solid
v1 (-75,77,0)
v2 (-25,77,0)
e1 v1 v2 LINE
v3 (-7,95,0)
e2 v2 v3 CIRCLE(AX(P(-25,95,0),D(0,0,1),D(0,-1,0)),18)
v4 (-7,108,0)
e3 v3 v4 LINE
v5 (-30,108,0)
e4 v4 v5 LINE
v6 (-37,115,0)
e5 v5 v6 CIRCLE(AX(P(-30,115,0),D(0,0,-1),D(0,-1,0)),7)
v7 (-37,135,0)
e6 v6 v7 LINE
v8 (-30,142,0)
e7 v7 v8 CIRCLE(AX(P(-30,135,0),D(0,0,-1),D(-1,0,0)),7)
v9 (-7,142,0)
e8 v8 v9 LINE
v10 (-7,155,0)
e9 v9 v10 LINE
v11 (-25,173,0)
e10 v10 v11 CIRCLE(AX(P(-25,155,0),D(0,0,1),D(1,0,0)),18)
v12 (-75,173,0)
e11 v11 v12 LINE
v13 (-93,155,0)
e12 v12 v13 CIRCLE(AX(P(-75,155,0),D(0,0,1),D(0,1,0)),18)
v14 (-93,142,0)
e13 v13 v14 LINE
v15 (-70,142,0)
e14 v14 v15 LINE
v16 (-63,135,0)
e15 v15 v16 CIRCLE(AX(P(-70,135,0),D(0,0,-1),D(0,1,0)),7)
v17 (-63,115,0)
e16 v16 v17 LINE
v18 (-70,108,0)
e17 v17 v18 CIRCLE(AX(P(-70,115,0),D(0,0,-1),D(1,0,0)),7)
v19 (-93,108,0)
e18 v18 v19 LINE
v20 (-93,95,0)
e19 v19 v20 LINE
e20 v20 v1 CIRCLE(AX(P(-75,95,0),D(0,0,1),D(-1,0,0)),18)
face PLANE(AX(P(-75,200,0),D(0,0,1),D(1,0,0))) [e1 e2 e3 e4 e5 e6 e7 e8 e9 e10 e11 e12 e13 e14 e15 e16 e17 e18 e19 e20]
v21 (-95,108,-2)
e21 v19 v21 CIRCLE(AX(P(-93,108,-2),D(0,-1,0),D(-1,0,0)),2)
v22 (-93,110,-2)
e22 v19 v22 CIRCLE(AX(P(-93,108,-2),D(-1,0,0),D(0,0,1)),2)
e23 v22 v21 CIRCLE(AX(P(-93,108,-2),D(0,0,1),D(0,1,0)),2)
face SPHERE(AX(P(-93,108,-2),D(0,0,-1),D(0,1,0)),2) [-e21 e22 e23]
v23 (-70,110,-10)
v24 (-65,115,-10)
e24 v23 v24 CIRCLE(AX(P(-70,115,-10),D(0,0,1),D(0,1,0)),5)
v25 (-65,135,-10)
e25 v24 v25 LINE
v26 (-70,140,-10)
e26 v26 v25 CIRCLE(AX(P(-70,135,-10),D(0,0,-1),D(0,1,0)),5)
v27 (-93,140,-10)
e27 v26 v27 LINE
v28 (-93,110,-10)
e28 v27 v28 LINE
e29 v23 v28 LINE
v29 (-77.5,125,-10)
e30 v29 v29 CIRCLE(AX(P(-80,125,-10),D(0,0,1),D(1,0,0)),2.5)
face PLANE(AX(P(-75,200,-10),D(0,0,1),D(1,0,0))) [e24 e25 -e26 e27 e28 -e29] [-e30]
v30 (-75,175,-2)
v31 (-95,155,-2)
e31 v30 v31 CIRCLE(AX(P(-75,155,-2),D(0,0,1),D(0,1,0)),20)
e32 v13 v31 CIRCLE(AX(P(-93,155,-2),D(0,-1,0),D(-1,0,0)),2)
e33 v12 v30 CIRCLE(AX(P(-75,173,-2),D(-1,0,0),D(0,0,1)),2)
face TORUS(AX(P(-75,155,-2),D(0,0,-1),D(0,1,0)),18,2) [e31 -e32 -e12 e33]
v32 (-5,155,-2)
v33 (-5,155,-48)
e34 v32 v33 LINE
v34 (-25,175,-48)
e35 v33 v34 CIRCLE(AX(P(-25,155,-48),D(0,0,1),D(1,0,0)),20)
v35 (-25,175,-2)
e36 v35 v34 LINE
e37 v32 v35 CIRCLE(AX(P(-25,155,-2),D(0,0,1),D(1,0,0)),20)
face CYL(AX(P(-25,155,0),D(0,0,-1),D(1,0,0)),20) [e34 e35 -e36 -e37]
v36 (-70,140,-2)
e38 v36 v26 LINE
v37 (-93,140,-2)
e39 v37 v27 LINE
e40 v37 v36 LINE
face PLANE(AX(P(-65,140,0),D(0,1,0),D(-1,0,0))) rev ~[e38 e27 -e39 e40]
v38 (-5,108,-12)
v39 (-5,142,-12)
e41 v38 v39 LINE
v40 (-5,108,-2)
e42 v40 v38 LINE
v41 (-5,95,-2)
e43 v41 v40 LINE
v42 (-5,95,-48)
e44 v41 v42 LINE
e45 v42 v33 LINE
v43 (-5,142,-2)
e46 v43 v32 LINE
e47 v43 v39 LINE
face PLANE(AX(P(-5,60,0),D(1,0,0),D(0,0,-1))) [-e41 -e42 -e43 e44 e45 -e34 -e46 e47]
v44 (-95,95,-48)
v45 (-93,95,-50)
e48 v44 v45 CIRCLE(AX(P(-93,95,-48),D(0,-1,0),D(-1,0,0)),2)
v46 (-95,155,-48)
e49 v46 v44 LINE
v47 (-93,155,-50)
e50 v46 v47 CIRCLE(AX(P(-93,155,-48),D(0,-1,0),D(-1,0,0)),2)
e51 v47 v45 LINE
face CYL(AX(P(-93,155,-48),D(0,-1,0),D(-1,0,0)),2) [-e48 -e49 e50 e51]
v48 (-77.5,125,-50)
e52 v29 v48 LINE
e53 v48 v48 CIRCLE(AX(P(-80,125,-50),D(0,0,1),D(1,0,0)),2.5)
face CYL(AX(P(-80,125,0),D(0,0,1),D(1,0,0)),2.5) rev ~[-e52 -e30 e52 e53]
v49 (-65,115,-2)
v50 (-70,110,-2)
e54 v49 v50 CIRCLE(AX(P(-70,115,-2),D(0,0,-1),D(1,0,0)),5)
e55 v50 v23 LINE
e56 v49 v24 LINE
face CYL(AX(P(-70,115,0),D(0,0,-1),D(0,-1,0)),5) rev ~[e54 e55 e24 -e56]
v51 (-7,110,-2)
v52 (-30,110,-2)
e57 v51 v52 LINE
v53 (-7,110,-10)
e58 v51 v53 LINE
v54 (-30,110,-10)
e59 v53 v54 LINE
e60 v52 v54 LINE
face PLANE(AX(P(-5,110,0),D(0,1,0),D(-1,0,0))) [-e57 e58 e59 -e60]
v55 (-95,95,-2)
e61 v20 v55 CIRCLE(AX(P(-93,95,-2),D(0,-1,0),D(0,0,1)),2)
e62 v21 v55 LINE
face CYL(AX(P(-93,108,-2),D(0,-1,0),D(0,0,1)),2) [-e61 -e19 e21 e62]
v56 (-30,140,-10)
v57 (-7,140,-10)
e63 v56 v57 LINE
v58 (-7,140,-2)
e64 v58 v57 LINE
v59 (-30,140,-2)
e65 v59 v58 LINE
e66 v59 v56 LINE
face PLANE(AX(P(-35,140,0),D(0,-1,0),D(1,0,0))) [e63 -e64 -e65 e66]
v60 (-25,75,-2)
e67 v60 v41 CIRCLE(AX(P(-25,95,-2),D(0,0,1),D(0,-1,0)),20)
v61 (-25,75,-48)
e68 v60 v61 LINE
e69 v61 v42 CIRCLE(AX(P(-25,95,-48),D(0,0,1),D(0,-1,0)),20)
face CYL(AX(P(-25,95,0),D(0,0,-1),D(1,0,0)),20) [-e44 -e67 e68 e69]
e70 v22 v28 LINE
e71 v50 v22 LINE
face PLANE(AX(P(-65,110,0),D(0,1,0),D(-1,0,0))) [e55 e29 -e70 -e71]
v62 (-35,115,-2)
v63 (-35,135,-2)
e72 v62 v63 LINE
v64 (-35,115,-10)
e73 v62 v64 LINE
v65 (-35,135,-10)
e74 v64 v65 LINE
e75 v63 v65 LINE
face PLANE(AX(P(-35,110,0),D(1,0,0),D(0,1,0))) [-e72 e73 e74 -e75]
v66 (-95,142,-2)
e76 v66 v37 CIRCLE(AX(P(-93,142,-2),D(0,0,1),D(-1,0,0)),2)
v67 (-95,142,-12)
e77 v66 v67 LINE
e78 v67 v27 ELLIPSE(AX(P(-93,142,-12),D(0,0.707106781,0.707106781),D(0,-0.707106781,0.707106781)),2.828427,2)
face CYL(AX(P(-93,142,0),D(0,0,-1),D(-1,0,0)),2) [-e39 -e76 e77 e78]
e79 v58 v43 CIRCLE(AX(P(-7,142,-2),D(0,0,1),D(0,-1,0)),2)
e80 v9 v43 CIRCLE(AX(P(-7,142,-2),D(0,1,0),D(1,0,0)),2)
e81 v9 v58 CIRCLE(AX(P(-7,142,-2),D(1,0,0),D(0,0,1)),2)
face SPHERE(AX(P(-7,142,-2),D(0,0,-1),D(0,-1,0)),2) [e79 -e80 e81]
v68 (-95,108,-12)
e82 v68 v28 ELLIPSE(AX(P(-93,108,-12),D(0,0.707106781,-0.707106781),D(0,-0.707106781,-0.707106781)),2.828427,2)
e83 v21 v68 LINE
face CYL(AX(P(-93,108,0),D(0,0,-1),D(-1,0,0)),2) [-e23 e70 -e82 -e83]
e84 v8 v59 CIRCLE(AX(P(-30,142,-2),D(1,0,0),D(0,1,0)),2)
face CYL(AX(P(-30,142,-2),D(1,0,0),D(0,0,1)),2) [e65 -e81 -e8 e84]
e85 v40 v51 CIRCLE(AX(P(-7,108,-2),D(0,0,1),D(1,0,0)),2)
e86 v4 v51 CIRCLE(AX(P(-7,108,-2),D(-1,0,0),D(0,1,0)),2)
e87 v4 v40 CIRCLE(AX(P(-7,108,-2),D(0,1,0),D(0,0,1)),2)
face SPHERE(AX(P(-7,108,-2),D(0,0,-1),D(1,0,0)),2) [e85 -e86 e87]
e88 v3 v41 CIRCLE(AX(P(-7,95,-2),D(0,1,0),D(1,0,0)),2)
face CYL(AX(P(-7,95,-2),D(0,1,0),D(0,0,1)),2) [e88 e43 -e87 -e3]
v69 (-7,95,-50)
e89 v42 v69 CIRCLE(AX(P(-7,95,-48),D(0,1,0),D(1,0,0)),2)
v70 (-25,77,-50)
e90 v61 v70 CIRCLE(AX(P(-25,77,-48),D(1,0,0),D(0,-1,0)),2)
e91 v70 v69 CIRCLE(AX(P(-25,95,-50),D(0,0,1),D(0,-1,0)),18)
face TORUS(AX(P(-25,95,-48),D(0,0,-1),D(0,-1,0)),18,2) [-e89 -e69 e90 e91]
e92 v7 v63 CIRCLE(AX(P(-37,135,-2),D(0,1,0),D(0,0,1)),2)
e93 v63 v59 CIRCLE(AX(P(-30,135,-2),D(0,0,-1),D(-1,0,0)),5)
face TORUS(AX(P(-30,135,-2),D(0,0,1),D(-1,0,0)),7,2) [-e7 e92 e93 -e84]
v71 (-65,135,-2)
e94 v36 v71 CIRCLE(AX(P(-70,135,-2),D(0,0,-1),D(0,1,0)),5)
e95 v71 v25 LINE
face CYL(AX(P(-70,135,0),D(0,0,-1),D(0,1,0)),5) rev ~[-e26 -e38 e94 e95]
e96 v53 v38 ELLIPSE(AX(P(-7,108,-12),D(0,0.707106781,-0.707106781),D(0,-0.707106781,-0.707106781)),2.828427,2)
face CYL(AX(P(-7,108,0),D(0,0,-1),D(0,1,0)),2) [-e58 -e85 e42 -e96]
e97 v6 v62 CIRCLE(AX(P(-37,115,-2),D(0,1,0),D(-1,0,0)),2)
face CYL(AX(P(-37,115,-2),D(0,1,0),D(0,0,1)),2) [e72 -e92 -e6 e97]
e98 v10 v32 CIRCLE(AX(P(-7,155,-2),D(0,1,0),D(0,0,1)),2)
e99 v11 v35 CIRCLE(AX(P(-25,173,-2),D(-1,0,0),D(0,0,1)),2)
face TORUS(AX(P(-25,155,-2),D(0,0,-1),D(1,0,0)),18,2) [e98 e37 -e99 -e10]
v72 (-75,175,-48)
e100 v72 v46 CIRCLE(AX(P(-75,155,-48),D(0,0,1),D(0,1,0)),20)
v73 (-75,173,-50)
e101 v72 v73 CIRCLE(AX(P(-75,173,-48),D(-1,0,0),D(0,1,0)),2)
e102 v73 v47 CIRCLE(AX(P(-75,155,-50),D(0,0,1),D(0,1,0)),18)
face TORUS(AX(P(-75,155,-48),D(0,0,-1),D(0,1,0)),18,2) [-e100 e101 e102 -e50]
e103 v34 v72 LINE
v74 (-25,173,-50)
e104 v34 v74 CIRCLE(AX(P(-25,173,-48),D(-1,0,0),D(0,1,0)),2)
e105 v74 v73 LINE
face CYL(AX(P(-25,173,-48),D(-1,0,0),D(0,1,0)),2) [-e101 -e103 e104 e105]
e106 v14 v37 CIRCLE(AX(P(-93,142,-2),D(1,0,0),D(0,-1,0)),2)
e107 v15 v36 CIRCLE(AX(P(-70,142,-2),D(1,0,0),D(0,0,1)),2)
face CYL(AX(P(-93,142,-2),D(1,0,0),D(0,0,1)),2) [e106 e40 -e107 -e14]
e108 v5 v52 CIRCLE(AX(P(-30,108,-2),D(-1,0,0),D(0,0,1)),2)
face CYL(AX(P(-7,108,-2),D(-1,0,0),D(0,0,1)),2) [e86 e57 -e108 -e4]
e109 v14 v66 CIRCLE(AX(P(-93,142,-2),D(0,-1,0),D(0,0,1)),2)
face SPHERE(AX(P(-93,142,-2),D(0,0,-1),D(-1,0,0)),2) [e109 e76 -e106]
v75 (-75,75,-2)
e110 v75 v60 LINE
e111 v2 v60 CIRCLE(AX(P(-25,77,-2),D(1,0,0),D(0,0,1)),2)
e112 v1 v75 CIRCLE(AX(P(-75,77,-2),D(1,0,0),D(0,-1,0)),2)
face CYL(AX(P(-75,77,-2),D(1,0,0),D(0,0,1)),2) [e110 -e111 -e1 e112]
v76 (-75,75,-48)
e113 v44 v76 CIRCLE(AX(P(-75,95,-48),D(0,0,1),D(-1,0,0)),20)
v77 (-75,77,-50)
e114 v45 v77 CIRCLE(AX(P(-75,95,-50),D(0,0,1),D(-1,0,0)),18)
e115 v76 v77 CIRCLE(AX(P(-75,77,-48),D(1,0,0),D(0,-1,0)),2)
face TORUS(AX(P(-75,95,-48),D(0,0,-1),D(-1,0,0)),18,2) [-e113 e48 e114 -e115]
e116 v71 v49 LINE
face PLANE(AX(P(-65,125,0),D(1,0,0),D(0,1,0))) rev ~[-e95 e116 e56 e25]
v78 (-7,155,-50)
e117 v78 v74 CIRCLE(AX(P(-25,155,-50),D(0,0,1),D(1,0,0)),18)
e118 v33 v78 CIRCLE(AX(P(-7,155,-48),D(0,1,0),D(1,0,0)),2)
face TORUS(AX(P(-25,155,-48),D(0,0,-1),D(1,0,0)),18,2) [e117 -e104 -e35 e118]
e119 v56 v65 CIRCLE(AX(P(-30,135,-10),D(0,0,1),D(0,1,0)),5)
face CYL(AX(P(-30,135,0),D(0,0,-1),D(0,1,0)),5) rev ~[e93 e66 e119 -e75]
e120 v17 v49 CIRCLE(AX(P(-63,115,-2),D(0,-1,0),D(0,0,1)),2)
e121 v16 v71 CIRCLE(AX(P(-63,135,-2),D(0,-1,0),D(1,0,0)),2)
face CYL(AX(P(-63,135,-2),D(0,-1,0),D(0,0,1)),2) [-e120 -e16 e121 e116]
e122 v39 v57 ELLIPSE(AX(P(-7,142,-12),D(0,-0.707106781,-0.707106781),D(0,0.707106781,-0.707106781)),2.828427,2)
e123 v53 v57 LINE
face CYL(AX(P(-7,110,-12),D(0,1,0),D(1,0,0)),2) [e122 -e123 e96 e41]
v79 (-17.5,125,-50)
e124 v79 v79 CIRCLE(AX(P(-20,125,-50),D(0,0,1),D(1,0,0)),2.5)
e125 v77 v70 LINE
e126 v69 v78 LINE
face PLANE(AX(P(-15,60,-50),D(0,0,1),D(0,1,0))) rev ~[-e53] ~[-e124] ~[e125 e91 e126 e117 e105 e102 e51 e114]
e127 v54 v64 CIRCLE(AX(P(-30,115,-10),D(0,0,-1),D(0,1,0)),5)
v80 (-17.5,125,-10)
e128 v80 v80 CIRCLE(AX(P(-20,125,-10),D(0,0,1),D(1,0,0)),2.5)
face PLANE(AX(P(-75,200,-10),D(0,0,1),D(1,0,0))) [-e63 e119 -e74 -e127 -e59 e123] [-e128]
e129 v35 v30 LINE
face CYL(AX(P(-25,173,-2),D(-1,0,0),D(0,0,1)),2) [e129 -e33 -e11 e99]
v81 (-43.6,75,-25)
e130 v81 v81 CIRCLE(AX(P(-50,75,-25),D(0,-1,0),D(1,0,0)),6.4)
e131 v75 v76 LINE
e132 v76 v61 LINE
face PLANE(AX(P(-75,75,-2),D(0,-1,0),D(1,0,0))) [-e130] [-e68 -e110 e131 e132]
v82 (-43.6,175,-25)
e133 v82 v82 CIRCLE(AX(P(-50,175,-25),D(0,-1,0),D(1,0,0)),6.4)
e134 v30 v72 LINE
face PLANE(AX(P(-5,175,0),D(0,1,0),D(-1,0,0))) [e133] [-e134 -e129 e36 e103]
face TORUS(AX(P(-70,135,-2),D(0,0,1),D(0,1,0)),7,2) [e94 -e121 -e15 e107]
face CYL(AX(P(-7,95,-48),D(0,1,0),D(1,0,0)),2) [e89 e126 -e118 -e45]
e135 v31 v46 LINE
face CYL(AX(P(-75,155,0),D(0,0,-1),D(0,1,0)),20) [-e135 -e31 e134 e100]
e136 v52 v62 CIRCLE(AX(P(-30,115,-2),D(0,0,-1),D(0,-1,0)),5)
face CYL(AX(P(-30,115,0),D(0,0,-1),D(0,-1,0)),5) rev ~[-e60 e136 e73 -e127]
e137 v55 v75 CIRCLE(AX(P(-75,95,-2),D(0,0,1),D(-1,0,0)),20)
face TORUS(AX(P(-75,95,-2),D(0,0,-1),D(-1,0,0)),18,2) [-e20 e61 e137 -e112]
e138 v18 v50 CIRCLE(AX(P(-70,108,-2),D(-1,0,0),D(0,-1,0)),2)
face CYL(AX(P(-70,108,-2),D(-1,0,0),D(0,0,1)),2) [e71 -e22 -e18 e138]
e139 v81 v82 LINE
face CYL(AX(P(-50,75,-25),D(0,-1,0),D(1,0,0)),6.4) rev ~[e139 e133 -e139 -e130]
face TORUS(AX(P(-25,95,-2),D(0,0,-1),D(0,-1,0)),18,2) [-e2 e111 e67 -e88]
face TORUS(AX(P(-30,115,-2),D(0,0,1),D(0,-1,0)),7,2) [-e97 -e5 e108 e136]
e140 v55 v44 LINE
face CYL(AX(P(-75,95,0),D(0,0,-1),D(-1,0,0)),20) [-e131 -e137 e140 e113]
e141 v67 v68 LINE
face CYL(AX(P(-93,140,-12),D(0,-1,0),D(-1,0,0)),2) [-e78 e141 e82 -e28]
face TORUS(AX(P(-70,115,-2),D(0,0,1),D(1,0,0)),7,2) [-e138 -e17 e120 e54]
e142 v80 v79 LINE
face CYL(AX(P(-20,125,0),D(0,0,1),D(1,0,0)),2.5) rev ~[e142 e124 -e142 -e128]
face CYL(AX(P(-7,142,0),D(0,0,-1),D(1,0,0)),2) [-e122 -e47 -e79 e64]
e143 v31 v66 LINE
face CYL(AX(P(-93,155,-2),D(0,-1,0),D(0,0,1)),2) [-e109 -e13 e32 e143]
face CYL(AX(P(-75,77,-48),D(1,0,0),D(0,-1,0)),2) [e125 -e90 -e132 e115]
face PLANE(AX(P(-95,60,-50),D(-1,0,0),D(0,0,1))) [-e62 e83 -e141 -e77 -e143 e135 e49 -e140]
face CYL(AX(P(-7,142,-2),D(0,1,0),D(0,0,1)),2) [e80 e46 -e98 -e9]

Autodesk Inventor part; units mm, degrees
ref_plane "YZ Plane" through (0, 0, 0) normal (1, 0, 0) x (0, 1, 0)
ref_plane "XZ Plane" through (0, 0, 0) normal (0, 1, 0) x (-1, 0, 0)
ref_plane "XY Plane" through (0, 0, 0) normal (0, 0, 1) x (1, 0, 0)
sketch "Sketch1" plane through (0, 0, 0) normal (0, 1, 0) x (-1, 0, 0)
  line L0 (0, 0) -> (100, 0)
  line L1 (100, 0) -> (100, -50)
  line L2 (100, -50) -> (0, -50)
  line L3 (0, -50) -> (0, 0)
  dimension "d0" = 100
  dimension "d1" = 50
extrude "Extrusion1" add sketch "Sketch1" along normal blind 250
sketch "Sketch5" plane through (0, 0, -50) normal (0, 0, -1) x (-1, 0, 0)
  line L0 (0, 250) -> (100, 250) projected
  line L1 (100, 0) -> (100, 250) projected
  circle A0 centre (50, 125) radius 5
  point P0 (0, 0)
  dimension "d85" = 10
extrude "Extrusion5" cut sketch "Sketch5" against normal through all
sketch "Sketch6" plane through (0, 0, 0) normal (0, -1, 0) x (1, 0, 0)
  line L0 (-100, 0) -> (0, 0) projected
  line L1 (0, -50) -> (-15, -50)
  line L2 (-15, -50) -> (-15, 0)
  line L3 (-15, 0) -> (0, 0)
  line L4 (0, 0) -> (0, -50)
  line L5 (-100, -50) -> (-100, 0) projected
  line L6 (-100, -50) -> (-85, -50)
  line L7 (-85, -50) -> (-85, 0)
  line L8 (-85, 0) -> (-100, 0)
  line L9 (-100, 0) -> (-100, -50)
  dimension "d18" = 15
  dimension "d19" = 15
extrude "Extrusion6" cut sketch "Sketch6" against normal through all
sketch "Sketch7" plane through (0, 0, 0) normal (0, -1, 0) x (1, 0, 0)
  line L0 (-15, -50) -> (-85, -50) projected
  line L1 (-85, 0) -> (-15, 0) projected
  line L2 (-15, -50) -> (-85, -50)
  line L3 (-85, -50) -> (-85, 0)
  line L4 (-85, 0) -> (-15, 0)
  line L5 (-15, 0) -> (-15, -50)
  point P0 (0, 0)
extrude "Extrusion7" cut sketch "Sketch7" against normal blind 50
sketch "Sketch8" plane through (0, 250, 0) normal (0, 1, 0) x (1, 0, 0)
  line L0 (-15, 50) -> (-85, 50) projected
  line L1 (-15, 0) -> (-15, 50) projected
  line L2 (-85, 50) -> (-15, 50)
  line L3 (-15, 50) -> (-15, 0)
  line L4 (-15, 0) -> (-85, 0)
  line L5 (-85, 0) -> (-85, 50)
  point P0 (0, 0)
extrude "Extrusion8" cut sketch "Sketch8" against normal blind 50
sketch "Sketch14" plane through (0, 200, 0) normal (0, 1, 0) x (1, 0, 0)
  point P0 (0, 0)
sketch "Sketch15" plane through (0, 200, 0) normal (0, 1, 0) x (1, 0, 0)
  line L0 (-15, 50) -> (-15, 0) projected
  line L1 (-85, 0) -> (-85, 50) projected
  line L2 (-15, 50) -> (-85, 50)
  line L3 (-85, 50) -> (-85, 45)
  line L4 (-85, 45) -> (-15, 45)
  line L5 (-15, 45) -> (-15, 50)
  line L6 (-15, 0) -> (-85, 0)
  line L7 (-85, 0) -> (-85, 5)
  line L8 (-85, 5) -> (-15, 5)
  line L9 (-15, 5) -> (-15, 0)
  point P0 (0, 0)
  dimension "d46" = 5
  dimension "d47" = 5
extrude "Extrusion13" cut sketch "Sketch15" against normal through all contours L0 L4 L1 L2 | L0 L6 L1 L8
sketch "Sketch16" plane through (-85, 50, -45) normal (-1, 0, 0) x (0, 0, 1)
  line L0 (45, 92.6169) -> (35, 92.6169)
  line L1 (35, 92.6169) -> (35, 57.3831)
  line L2 (35, 57.3831) -> (45, 57.3831)
  line L3 (45, 57.3831) -> (45, 92.6169)
  line L4 (40, 150) -> (40, 0) projected
  line L5 (45, 92.6169) -> (35, 57.3831) construction
  line L6 (35, 92.6169) -> (45, 57.3831) construction
  line L7 (40, 92.6169) -> (40, 57.3831)
  point P0 (45, -50)
  point P1 (40, 75)
  dimension "d50" = 10
extrude "Extrusion14" add sketch "Sketch16" along normal blind 34.5 contours L4 L2 L1 L0
sketch "Sketch17" plane through (-85, 200, -5) normal (0, 0, 1) x (1, 0, 0)
  line L0 (-34.5, -92.6169) -> (-34.5, -57.3831) projected
  line L1 (-34.5, -75) -> (-29.5, -75)
  circle A0 centre (-29.5, -75) radius 2.5
  point P0 (85, -200)
  dimension "d53" = 5
  dimension "d54" = 5
extrude "Extrusion15" cut sketch "Sketch17" against normal through all
thread "Thread1" size "M5x0.8" class "6H" standard "ANSI Metric M Profile" full length
sketch "Sketch19" plane through (-119.5, 50, -45) normal (-1, 0, 0) x (0, 0, 1)
  line L0 (40, 57.3831) -> (40, 92.6169) projected
  line L1 (40, 57.3831) -> (35, 57.3831) projected
  line L2 (40, 92.6169) -> (35, 92.6169)
  line L3 (35, 92.6169) -> (35, 57.3831)
  line L4 (35, 57.3831) -> (40, 57.3831)
  line L5 (40, 57.3831) -> (40, 92.6169)
  point P0 (45, -50)
extrude "Extrusion17" add sketch "Sketch19" along normal blind 32
sketch "Sketch20" plane through (-85, 200, -5) normal (0, 0, 1) x (1, 0, 0)
  line L0 (-66.5, -92.6169) -> (-66.5, -57.3831) projected
  circle A0 centre (-61.5, -75) radius 2.5
  point P0 (85, -200)
  dimension "d73" = 5
extrude "Extrusion18" cut sketch "Sketch20" against normal blind 32
thread "Thread2" size "M5x0.8" class "6H" standard "ANSI Metric M Profile" full length
sketch "Sketch21" plane through (0, 50, 0) normal (0, -1, 0) x (1, 0, 0)
  line L0 (-15, -5) -> (-85, -5) projected
  line L1 (-15, -5) -> (-15, -45) projected
  circle A0 centre (-50, -25) radius 7.5
  point P0 (0, 0)
  dimension "d86" = 15
extrude "Extrusion19" cut sketch "Sketch21" against normal blind 55
sketch "Sketch22" plane through (0, 200, 0) normal (0, 1, 0) x (1, 0, 0)
  circle A0 centre (-50, 25) radius 7.5
  point P0 (0, 0)
  dimension "d87" = 15
extrude "Extrusion20" cut sketch "Sketch22" against normal blind 55
fillet "Fillet1" radius 10 4 edges at (-85, 200, -25) (-15, 200, -25) (-85, 50, -25) (-15, 50, -25)
sketch "Sketch23" plane through (-85, 107.3831, -10) normal (0, 0, -1) x (-1, 0, 0)
  circle A0 centre (61.5, 17.6169) radius 2.5 projected
  circle A1 centre (61.5, 17.6169) radius 2.5 projected
  line L0 (66.5, 35.2339) -> (66.5, 0) projected
  circle A2 centre (29.5, 17.6169) radius 2.5 projected
  line L1 (0, 0) -> (66.5, 0) projected
  circle A3 centre (61.5, 17.6169) radius 2.5 projected
  circle A4 centre (29.5, 17.6169) radius 2.5 projected
  line L2 (0, 0) -> (0, 35.2339) projected
  line L3 (0, 0) -> (66.5, 0) projected
  line L4 (66.5, 35.2339) -> (66.5, 0) projected
  line L5 (0, 35.2339) -> (66.5, 35.2339) projected
  point P0 (-85, -107.3831)
extrude "Extrusion21" add sketch "Sketch23" along normal blind 5
fillet "Fillet2" radius 30 2 edges at (-85, 142.6169, -10) (-85, 107.3831, -10)
fillet "Fillet3" radius 10 2 edges at (-151.5, 107.3831, -10) (-151.5, 142.6169, -10)
fillet "Fillet4" radius 20 1 edges at (-85, 125, -15)
sketch "Sketch25" plane through (-151.5, 50, -45) normal (-1, 0, 0) x (0, 0, 1)
  line L0 (30, 92.6169) -> (40, 92.6169) projected
  line L1 (30, 92.6169) -> (40, 92.6169)
  line L2 (40, 92.6169) -> (40, 57.3831)
  line L3 (40, 57.3831) -> (30, 57.3831)
  line L4 (30, 57.3831) -> (30, 92.6169)
  point P0 (45, -50)
extrude "Extrusion22" add sketch "Sketch25" against normal blind 10
fillet "Fillet5" radius 10 2 edges at (-151.5, 107.3831, -10) (-151.5, 142.6169, -10)
sketch "Sketch26" plane through (-75, 200, -5) normal (0, 0, 1) x (1, 0, 0)
  circle A0 centre (-71.5, -75) radius 2.5
  circle A1 centre (-39.5, -75) radius 2.5 projected
  point P0 (75, -200)
  dimension "d91" = 5
  dimension "d92" = 32
extrude "Extrusion23" cut sketch "Sketch26" against normal blind 10 contours A0
sketch "Sketch27" plane through (0, 200, 0) normal (0, 1, 0) x (1, 0, 0)
  line L0 (-85, 45) -> (-85, 5) projected
  line L1 (-5.7432, 0) -> (-85, 0)
  line L2 (-85, 0) -> (-85, 45)
  line L3 (-85, 45) -> (-5.7432, 45)
  line L4 (-5.7432, 45) -> (-5.7432, 0)
  line L5 (-85, 0) -> (-209.0524, 0)
  line L6 (-209.0524, 0) -> (-209.0524, 63.2581)
  line L7 (-209.0524, 63.2581) -> (-85, 63.2581)
  line L8 (-85, 63.2581) -> (-85, 0)
  point P0 (0, 0)
extrude "Extrusion24" cut sketch "Sketch27" against normal up to surface (150 mm away) contours L0 L2 L5 L6 L7 L8
sketch "Sketch28" plane through (-75, 200, -5) normal (0, 0, 1) x (1, 0, 0)
  line L0 (-10, -140) -> (-10, -10) projected
  arc A0 (-10, -140) -> (0, -150) centre (0, -140) ccw projected
  line L1 (50, -150) -> (0, -150) projected
  arc A1 (50, -150) -> (60, -140) centre (50, -140) ccw projected
  line L2 (60, -10) -> (60, -140) projected
  arc A2 (60, -10) -> (50, 0) centre (50, -10) ccw projected
  line L3 (0, 0) -> (50, 0) projected
  arc A3 (0, 0) -> (-10, -10) centre (0, -10) ccw projected
  circle A4 centre (25, -75) radius 5 projected
  line L4 (32.5, -95) -> (17.5, -95) projected
  arc A5 (50, -150) -> (60, -140) centre (50, -140) ccw projected
  line L5 (0, -150) -> (50, -150) projected
  arc A6 (-10, -140) -> (0, -150) centre (0, -140) ccw projected
  line L6 (-10, -10) -> (-10, -140) projected
  arc A7 (0, 0) -> (-10, -10) centre (0, -10) ccw projected
  line L7 (50, 0) -> (0, 0) projected
  arc A8 (60, -10) -> (50, 0) centre (50, -10) ccw projected
  line L8 (60, -140) -> (60, -10) projected
  circle A9 centre (25, -75) radius 5 projected
  point P0 (75, -200)
extrude "Extrusion25" add sketch "Sketch28" along normal blind 5
sketch "Sketch29" plane through (-25, 200, -45) normal (0, 0, -1) x (-1, 0, 0)
  arc A0 (-10, -140) -> (0, -150) centre (0, -140) ccw projected
  line L0 (50, -150) -> (0, -150) projected
  arc A1 (50, -150) -> (60, -140) centre (50, -140) ccw projected
  line L1 (60, -10) -> (60, -140) projected
  arc A2 (60, -10) -> (50, 0) centre (50, -10) ccw projected
  line L2 (0, 0) -> (50, 0) projected
  arc A3 (0, 0) -> (-10, -10) centre (0, -10) ccw projected
  line L3 (-10, -140) -> (-10, -10) projected
  circle A4 centre (25, -75) radius 5 projected
  point P0 (-25, -200)
extrude "Extrusion26" add sketch "Sketch29" along normal blind 5
sketch "Sketch37" plane through (-75, 200, 0) normal (0, 0, 1) x (1, 0, 0)
  point P0 (75, -200)
sketch "Sketch38" plane through (0, 50, 0) normal (0, -1, 0) x (1, 0, 0)
  line L0 (-85, 0) -> (-15, 0)
  line L1 (-15, 0) -> (-15, -50)
  line L2 (-15, -50) -> (-85, -50)
  line L3 (-85, -50) -> (-85, 0)
  circle A0 centre (-50, -25) radius 7.5 projected
  line L4 (-85, 0) -> (-15, -50) construction
  line L5 (-15, 0) -> (-85, -50) construction
  point P0 (0, 0)
extrude "Extrusion32" cut sketch "Sketch38" against normal blind 10
sketch "Sketch39" plane through (0, 200, 0) normal (0, 1, 0) x (1, 0, 0)
  line L0 (-15, 0) -> (-85, 0)
  line L1 (-85, 0) -> (-85, 50)
  line L2 (-85, 50) -> (-15, 50)
  line L3 (-15, 50) -> (-15, 0)
  circle A0 centre (-50, 25) radius 7.5 projected
  line L4 (-15, 0) -> (-85, 50) construction
  line L5 (-85, 0) -> (-15, 50) construction
  point P0 (0, 0)
extrude "Extrusion33" cut sketch "Sketch39" against normal blind 10
sketch "Sketch40" plane through (-85, 60, -50) normal (-1, 0, 0) x (0, 0, 1)
  line L0 (50, 130) -> (0, 130) projected
  line L1 (50, 0) -> (0, 0) projected
  line L2 (50, 130) -> (0, 130)
  line L3 (0, 130) -> (0, 0)
  line L4 (0, 0) -> (50, 0)
  line L5 (50, 0) -> (50, 130)
  point P0 (50, -60)
extrude "Extrusion34" add sketch "Sketch40" along normal blind 10
sketch "Sketch41" plane through (-15, 60, 0) normal (1, 0, 0) x (0, 0, -1)
  line L0 (0, 130) -> (50, 130) projected
  line L1 (0, 0) -> (0, 130) projected
  line L2 (50, 130) -> (0, 130)
  line L3 (0, 130) -> (0, 0)
  line L4 (0, 0) -> (50, 0)
  line L5 (50, 0) -> (50, 130)
  point P0 (0, -60)
extrude "Extrusion35" add sketch "Sketch41" along normal blind 10
sketch "Sketch42" plane through (-75, 200, 0) normal (0, 0, 1) x (1, 0, 0)
  line L0 (-20, -10) -> (-20, -140) projected
  line L1 (-20, -95) -> (-20, -55)
  line L2 (10, -75) -> (10, -90)
  line L3 (10, -75) -> (10, -60)
  line L4 (10, -60) -> (-20, -60)
  line L5 (10, -90) -> (-20, -90)
  line L6 (-20, -75) -> (10, -75)
  circle A0 centre (-5, -75) radius 2.5
  point P0 (75, -200)
  dimension "d144" = 5
extrude "Extrusion36" cut sketch "Sketch42" against normal blind 10 contours L4 L3 L6 A0 L0 | L6 A0 L2 L5 L0
sketch "Sketch43" plane through (-75, 200, 0) normal (0, 0, 1) x (1, 0, 0)
  line L0 (-20, -140) -> (-20, -10) projected
  point P0 (75, -200)
extrude "Extrusion37" cut sketch "Sketch42" against normal up to surface (50 mm away) contours A0 L6 | L6 A0
sketch "Sketch44" plane through (-75, 200, 0) normal (0, 0, 1) x (1, 0, 0)
  line L0 (-20, -60) -> (10, -60) projected
  line L1 (10, -90) -> (-20, -90) projected
  line L2 (10, -60) -> (10, -90) projected
  line L3 (70, -140) -> (70, -10) projected
  line L4 (70, -90) -> (40, -90)
  line L5 (40, -90) -> (40, -60)
  line L6 (40, -60) -> (70, -60)
  line L7 (70, -60) -> (70, -90)
  circle A0 centre (55, -75) radius 2.5
  point P0 (75, -200)
  dimension "d147" = 30
  dimension "d150" = 5
extrude "Extrusion38" cut sketch "Sketch44" against normal blind 10
extrude "Extrusion39" cut sketch "Sketch44" against normal up to surface (50 mm away) contours A0
fillet "Fillet7" radius 5 4 edges at (-35, 110, -5) (-35, 140, -5) (-65, 140, -5) (-65, 110, -5)
fillet "Fillet8" radius 2 6 edges at (-5, 110, -5) (-5, 140, -5) (-5, 125, -10) (-95, 125, -10) (-95, 140, -5) (-95, 110, -5)
sketch "Sketch45" plane through (-75, 200, 0) normal (0, 0, 1) x (1, 0, 0)
  line L0 (-20, -10) -> (-20, -140) projected
  line L1 (70, -140) -> (70, -10) projected
  line L2 (-20, -140) -> (70, -140)
  line L3 (70, -140) -> (70, -125)
  line L4 (70, -125) -> (-20, -125)
  line L5 (-20, -125) -> (-20, -140)
  line L6 (-20, -10) -> (70, -10) projected
  line L7 (-20, -10) -> (70, -10)
  line L8 (70, -10) -> (70, -25)
  line L9 (70, -25) -> (-20, -25)
  line L10 (-20, -25) -> (-20, -10)
  point P0 (75, -200)
  dimension "d158" = 15
  dimension "d159" = 15
extrude "Extrusion40" cut sketch "Sketch45" against normal up to surface (50 mm away) contours L6 L1 L9 L0 | L4 L1 L2 L0
sketch "Sketch46" plane through (-75, 200, 0) normal (0, 0, 1) x (1, 0, 0)
  circle A0 centre (25, -75) radius 5 projected
  circle A1 centre (25, -75) radius 5
  point P0 (75, -200)
extrude "Extrusion41" add sketch "Sketch46" against normal up to surface (50 mm away)
sketch "Sketch47" plane through (-95, 175, 0) normal (0, 1, 0) x (1, 0, 0)
  circle A0 centre (45, 25) radius 7.5 projected
  circle A1 centre (45, 25) radius 7.5
  circle A2 centre (45, 25) radius 7.5 projected
  point P0 (95, 0)
extrude "Extrusion42" cut sketch "Sketch47" against normal up to surface (100 mm away)
fillet "Fillet9" radius 20 4 edges at (-95, 175, -25) (-95, 75, -25) (-5, 75, -25) (-5, 175, -25)
fillet "Fillet10" radius 2 32 edges at (-89.1421, 80.8579, -50) (-50, 75, -50) (-10.8579, 80.8579, -50) (-5, 125, -50) (-10.8579, 169.1421, -50) (-50, 175, -50) (-89.1421, 169.1421, -50) (-95, 125, -50) (-50, 175, 0) (-10.8579, 169.1421, 0) (-5, 148.5, 0) (-5, 101.5, 0) (-5.5858, 140.5858, 0) (-18.5, 140, 0) (-33.5355, 138.5355, 0) (-35, 125, 0) (-33.5355, 111.4645, 0) (-18.5, 110, 0) (-5.5858, 109.4142, 0) (-10.8579, 80.8579, 0) (-50, 75, 0) (-89.1421, 80.8579, 0) (-95, 148.5, 0) (-95, 101.5, 0) (-94.4142, 109.4142, 0) (-81.5, 110, 0) (-66.4645, 111.4645, 0) (-65, 125, 0) (-66.4645, 138.5355, 0) (-81.5, 140, 0) (-94.4142, 140.5858, 0) (-89.1421, 169.1421, 0)
sketch "Sketch48" plane through (-75, 75, -2) normal (0, -1, 0) x (1, 0, 0)
  circle A0 centre (25, -23) radius 7.5 projected
  circle A1 centre (25, -23) radius 7.5
  point P0 (75, 2)
extrude "Extrusion43" add sketch "Sketch48" against normal up to surface (100 mm away)
sketch "Sketch49" plane through (-75, 75, -2) normal (0, -1, 0) x (1, 0, 0)
  circle A0 centre (25, -23) radius 7.5 projected
  circle A1 centre (25, -23) radius 6
  point P0 (75, 2)
  dimension "d170" = 12
extrude "Extrusion44" cut sketch "Sketch49" against normal up to surface (100 mm away) contours A1
sketch "Sketch50" plane through (-75, 75, -2) normal (0, -1, 0) x (1, 0, 0)
  circle A0 centre (25, -23) radius 6 projected
  circle A1 centre (25, -23) radius 6.4
  point P0 (75, 2)
  dimension "d173" = 12.8
extrude "Extrusion45" cut sketch "Sketch50" against normal up to surface (100 mm away)
properties part number "Madeira" material "PBT Plastic"
